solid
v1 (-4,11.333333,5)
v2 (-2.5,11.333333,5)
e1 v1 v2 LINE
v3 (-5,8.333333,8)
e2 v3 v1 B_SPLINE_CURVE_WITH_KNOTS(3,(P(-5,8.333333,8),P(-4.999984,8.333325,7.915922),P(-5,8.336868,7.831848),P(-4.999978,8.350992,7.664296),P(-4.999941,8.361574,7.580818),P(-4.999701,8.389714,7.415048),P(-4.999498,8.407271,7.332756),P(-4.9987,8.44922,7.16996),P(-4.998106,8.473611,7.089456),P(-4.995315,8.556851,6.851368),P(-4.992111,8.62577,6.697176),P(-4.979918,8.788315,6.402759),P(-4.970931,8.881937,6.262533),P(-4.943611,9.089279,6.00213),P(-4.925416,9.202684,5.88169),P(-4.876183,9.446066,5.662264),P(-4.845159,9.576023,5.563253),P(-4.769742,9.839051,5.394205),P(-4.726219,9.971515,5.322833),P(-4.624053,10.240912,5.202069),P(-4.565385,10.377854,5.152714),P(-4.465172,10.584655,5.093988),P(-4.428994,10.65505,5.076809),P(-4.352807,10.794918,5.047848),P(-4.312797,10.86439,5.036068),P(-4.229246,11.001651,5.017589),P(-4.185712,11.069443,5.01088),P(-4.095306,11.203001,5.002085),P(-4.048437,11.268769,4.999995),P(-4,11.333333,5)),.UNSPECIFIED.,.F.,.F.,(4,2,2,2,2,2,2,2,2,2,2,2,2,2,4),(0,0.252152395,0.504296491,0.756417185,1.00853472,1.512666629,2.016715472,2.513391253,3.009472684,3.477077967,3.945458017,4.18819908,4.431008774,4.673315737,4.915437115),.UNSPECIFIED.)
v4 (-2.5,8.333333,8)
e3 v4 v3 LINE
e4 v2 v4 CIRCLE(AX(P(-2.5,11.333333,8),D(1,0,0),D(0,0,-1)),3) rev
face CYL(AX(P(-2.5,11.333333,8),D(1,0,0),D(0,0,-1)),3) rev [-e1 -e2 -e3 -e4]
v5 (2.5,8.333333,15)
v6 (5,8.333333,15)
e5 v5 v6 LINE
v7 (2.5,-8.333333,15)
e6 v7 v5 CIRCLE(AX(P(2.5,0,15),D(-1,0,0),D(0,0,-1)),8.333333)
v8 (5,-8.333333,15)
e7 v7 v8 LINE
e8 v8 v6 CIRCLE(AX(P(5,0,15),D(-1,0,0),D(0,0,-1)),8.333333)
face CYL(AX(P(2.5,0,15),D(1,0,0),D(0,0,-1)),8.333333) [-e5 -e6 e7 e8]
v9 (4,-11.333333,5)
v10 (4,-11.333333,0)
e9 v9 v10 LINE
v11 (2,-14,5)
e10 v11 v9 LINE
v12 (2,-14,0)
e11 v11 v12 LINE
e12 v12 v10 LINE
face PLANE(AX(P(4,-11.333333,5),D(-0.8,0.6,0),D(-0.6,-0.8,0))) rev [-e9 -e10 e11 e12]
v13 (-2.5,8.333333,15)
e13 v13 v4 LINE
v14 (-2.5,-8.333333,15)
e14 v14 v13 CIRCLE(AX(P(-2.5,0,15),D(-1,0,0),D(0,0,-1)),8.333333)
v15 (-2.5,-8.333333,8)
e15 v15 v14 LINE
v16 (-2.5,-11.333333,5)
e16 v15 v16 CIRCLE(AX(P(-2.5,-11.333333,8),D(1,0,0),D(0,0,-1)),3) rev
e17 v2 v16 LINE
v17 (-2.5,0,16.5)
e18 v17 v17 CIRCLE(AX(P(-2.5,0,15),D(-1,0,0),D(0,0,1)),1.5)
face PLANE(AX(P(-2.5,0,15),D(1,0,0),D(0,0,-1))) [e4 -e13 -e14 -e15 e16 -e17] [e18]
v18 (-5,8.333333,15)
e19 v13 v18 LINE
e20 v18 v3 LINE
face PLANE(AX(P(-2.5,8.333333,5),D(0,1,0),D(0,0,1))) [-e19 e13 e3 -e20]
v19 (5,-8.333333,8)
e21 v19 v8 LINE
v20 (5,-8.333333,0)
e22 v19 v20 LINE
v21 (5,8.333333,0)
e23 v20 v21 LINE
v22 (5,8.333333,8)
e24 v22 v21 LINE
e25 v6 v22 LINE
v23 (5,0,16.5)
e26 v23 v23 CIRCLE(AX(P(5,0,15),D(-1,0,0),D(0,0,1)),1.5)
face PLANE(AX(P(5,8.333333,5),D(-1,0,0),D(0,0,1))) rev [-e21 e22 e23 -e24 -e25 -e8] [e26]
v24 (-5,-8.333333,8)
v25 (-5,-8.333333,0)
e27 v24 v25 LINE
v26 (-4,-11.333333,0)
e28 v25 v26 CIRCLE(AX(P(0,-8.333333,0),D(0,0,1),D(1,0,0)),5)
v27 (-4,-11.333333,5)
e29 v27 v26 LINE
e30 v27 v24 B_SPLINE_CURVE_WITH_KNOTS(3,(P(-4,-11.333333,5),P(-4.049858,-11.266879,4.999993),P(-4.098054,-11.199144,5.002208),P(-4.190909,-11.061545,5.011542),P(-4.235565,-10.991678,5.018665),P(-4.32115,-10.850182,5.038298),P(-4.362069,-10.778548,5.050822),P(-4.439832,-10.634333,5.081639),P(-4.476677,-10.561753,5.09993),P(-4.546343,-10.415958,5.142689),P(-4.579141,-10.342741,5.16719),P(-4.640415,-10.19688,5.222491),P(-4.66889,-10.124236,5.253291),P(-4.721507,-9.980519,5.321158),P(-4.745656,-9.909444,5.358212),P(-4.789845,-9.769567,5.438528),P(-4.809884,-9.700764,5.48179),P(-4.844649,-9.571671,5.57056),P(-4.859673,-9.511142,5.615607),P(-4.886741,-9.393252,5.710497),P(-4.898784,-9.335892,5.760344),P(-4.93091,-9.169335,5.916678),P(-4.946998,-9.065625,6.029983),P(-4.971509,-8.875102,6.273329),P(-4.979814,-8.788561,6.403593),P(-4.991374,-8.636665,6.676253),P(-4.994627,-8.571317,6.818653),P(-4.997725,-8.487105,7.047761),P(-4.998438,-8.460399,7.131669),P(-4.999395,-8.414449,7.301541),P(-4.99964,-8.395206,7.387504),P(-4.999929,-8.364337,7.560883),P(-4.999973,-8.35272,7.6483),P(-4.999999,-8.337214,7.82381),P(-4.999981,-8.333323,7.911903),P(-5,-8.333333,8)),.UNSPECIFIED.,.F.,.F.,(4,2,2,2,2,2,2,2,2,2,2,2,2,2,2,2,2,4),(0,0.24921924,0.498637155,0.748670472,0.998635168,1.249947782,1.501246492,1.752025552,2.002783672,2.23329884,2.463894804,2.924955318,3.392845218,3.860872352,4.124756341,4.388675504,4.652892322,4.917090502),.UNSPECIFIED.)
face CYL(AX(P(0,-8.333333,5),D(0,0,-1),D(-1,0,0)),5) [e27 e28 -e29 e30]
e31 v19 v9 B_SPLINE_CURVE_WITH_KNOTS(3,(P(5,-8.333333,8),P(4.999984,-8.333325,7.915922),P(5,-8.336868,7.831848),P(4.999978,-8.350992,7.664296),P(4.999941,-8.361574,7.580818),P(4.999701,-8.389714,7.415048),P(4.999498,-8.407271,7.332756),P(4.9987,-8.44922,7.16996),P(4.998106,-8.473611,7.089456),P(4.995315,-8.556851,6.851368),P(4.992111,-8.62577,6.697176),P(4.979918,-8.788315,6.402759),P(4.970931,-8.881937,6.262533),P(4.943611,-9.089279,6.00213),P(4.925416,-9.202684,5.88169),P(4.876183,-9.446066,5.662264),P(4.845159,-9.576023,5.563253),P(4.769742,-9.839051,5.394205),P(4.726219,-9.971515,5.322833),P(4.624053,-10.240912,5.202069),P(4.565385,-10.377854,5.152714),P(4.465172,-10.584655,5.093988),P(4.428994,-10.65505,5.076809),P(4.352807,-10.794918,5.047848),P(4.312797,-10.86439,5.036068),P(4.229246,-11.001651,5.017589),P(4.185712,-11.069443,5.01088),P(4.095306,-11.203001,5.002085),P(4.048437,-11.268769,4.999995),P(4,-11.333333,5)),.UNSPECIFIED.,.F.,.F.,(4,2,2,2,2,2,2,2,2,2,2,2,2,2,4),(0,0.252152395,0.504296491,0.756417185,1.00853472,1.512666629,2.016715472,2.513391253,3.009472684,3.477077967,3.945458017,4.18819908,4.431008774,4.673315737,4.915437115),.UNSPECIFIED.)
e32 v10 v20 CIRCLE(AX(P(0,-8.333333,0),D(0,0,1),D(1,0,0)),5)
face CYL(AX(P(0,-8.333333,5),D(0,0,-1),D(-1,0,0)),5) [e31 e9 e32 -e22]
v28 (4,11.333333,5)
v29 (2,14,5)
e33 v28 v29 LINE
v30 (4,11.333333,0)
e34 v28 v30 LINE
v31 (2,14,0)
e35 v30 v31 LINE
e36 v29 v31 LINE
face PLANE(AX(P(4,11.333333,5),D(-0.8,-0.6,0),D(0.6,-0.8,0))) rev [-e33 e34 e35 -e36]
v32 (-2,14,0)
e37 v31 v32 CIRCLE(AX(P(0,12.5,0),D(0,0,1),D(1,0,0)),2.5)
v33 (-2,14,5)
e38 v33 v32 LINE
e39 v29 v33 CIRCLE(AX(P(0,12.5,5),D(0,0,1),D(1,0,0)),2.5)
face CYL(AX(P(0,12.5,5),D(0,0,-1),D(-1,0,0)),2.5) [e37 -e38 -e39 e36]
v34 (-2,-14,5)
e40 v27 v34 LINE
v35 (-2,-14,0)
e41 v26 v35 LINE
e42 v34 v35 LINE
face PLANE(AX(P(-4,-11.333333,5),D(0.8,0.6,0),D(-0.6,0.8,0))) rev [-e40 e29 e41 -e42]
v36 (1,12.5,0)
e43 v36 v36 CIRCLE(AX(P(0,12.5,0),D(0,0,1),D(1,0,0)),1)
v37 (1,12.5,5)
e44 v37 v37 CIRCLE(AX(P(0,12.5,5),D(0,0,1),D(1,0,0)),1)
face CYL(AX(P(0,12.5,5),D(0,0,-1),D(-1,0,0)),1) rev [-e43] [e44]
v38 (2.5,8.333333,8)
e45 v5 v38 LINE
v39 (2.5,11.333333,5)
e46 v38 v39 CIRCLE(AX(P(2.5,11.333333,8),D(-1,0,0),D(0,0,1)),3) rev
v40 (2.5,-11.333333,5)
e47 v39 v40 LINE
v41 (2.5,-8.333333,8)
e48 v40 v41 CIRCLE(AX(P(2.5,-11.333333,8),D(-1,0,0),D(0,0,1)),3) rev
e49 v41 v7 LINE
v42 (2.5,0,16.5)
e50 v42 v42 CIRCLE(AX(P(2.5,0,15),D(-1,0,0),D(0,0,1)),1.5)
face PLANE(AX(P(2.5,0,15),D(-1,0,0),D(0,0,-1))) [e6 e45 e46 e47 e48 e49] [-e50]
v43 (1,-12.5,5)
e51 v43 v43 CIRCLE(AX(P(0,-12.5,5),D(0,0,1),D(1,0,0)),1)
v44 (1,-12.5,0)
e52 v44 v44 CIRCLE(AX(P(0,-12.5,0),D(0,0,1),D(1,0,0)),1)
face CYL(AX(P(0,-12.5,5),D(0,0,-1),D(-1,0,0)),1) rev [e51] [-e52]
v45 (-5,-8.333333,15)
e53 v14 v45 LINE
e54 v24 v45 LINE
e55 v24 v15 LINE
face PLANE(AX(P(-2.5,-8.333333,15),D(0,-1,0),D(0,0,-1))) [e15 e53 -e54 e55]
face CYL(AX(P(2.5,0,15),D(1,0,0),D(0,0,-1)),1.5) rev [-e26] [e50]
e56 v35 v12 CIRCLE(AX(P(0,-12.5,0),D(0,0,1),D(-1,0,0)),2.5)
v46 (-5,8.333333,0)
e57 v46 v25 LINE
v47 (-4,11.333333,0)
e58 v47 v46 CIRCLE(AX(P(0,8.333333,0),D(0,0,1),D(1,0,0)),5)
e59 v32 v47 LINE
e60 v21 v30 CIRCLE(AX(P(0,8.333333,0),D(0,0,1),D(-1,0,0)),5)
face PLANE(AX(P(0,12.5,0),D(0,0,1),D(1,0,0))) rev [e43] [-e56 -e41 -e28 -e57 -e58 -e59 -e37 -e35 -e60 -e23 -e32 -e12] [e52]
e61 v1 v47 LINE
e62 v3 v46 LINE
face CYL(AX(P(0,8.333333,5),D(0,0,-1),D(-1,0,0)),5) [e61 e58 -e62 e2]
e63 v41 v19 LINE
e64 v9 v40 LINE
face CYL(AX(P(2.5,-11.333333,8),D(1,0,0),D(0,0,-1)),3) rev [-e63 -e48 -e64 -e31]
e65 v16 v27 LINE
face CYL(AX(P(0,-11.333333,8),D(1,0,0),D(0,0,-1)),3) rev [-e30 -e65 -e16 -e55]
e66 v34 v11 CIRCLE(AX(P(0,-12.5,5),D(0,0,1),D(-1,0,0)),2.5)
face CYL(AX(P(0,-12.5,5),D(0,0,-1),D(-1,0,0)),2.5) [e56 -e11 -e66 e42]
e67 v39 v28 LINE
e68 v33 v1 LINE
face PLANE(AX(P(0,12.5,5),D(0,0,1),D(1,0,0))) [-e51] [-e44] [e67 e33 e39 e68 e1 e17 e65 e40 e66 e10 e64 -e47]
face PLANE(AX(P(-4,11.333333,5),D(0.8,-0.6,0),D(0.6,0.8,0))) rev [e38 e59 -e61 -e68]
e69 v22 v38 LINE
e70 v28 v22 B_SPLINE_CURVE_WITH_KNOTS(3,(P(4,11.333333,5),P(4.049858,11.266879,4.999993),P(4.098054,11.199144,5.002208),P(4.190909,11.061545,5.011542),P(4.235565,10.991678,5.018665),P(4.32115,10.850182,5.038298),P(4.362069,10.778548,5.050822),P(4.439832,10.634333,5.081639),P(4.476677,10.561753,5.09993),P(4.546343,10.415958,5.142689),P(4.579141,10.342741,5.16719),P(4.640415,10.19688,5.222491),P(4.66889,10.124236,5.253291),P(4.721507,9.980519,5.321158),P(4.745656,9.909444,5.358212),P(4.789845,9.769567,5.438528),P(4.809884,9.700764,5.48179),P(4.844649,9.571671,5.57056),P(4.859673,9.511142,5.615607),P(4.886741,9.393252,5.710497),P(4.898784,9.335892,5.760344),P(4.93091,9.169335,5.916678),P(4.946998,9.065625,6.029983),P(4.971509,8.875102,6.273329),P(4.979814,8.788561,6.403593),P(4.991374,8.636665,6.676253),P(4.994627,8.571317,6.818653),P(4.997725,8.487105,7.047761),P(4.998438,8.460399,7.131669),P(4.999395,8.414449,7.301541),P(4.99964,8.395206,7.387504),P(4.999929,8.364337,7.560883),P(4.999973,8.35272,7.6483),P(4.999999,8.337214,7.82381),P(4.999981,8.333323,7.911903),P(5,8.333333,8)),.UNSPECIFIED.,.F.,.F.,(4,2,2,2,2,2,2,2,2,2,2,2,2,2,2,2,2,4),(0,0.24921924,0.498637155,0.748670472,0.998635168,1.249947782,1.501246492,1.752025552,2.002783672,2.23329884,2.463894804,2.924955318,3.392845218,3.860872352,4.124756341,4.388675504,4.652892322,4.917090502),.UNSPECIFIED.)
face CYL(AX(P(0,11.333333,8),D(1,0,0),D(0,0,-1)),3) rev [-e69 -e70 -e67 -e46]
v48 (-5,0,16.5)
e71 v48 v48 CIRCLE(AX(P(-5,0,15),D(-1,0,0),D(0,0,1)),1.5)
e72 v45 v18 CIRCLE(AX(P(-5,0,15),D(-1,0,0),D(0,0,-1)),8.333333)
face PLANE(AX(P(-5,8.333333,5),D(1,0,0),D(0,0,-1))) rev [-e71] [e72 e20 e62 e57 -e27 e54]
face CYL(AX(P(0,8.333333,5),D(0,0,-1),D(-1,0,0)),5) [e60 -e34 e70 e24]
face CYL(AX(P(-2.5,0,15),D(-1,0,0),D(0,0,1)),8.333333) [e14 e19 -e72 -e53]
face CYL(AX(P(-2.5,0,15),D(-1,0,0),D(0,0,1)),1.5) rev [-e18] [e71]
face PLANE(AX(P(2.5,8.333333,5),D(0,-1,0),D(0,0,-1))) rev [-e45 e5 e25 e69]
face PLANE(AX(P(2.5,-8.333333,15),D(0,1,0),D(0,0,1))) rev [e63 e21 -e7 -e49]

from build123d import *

# Parameters (mm, degrees)
ESQUISSE1_R        = 1
BOSS_EXTRU_1_DEPTH = 5
ESQUISSE2_R        = 1.5
BOSS_EXTRU_2_DEPTH = 2.5
CONG_1_R           = 3


with BuildPart() as part:
    # Esquisse1 → Boss.-Extru.1 (new body)
    with BuildSketch(Plane.XY):
        with BuildLine():
            Line((-4, 11.333333333), (-2, 14))
            ThreePointArc((-2, 14), (0, 15), (2, 14))
            Line((2, 14), (4, 11.333333333))
            ThreePointArc((4, 11.333333333), (4.74341649, 9.914472163), (5, 8.333333333))
            Line((5, 8.333333333), (5, -8.333333333))
            ThreePointArc((5, -8.333333333), (4.74341649, -9.914472163), (4, -11.333333333))
            Line((4, -11.333333333), (2, -14))
            ThreePointArc((2, -14), (0, -15), (-2, -14))
            Line((-2, -14), (-4, -11.333333333))
            ThreePointArc((-4, -11.333333333), (-4.74341649, -9.914472163), (-5, -8.333333333))
            Line((-5, -8.333333333), (-5, 8.333333333))
            ThreePointArc((-5, 8.333333333), (-4.74341649, 9.914472163), (-4, 11.333333333))
        make_face()
        with Locations((0, 12.5)):
            Circle(ESQUISSE1_R, mode=Mode.SUBTRACT)
        with Locations((0, -12.5)):
            Circle(ESQUISSE1_R, mode=Mode.SUBTRACT)
    extrude(amount=BOSS_EXTRU_1_DEPTH)

    # Esquisse2 → Boss.-Extru.2 (add)
    with BuildSketch(Plane.ZY.offset(5)):
        with BuildLine():
            Line((5, 8.333333333), (15, 8.333333333))
            ThreePointArc((15, 8.333333333), (23.333333333, 0), (15, -8.333333333))
            Line((15, -8.333333333), (5, -8.333333333))
            Line((5, -8.333333333), (5, 8.333333333))
        make_face()
        with Locations((15, 0)):
            Circle(ESQUISSE2_R, mode=Mode.SUBTRACT)
    boss_extru_2 = extrude(amount=-BOSS_EXTRU_2_DEPTH)

    # Symétrie1: Boss.-Extru.2 across plane
    add(boss_extru_2.mirror(Plane(origin=(0, 0, 0), x_dir=(0, 0, 1), z_dir=(1, 0, 0))))

    # Congé1
    # the kernel refuses this fillet: 3 mm, written as the material it adds along each edge
    with BuildSketch(Plane(origin=(12.5, 8.333333333, 5), x_dir=(0, 1, 0), z_dir=(-1, 0, 0))) as cong_1_piece_1_section:
        with BuildLine():
            CenterArc((CONG_1_R, -CONG_1_R), CONG_1_R, 90, 90)
            Line((0, -CONG_1_R), (0, 0))
            Line((0, 0), (CONG_1_R, 0))
        make_face()
    cong_1_piece_1 = extrude(amount=10, mode=Mode.PRIVATE)
    cong_1_piece_1 = cong_1_piece_1 & Plane(origin=(0, 8.333333333, 5.683499062), x_dir=(-1, 0, 0), z_dir=(0, 0, -1)) * Cylinder(5, 32, mode=Mode.PRIVATE)
    add(cong_1_piece_1)
    with BuildSketch(Plane(origin=(12.5, 8.333333333, 5), x_dir=(0, 1, 0), z_dir=(-1, 0, 0))) as cong_1_piece_2_section:
        with BuildLine():
            CenterArc((CONG_1_R, -CONG_1_R), CONG_1_R, 90, 90)
            Line((0, -CONG_1_R), (0, 0))
            Line((0, 0), (CONG_1_R, 0))
        make_face()
    cong_1_piece_2 = extrude(amount=17.5, mode=Mode.PRIVATE)
    cong_1_piece_2 = cong_1_piece_2 & Plane(origin=(0, 8.333333333, 5.683498856), x_dir=(-1, 0, 0), z_dir=(0, 0, -1)) * Cylinder(5, 47, mode=Mode.PRIVATE)
    cong_1_piece_2 = split(cong_1_piece_2, bisect_by=Plane(origin=(-2.5, 8.977430515, 5.683498856), z_dir=(-1, 0, 0)), keep=Keep.TOP, mode=Mode.PRIVATE)
    add(cong_1_piece_2)
    with BuildSketch(Plane(origin=(12.5, -8.333333333, 5), x_dir=(0, -1, 0), z_dir=(-1, 0, 0))) as cong_1_piece_3_section:
        with BuildLine():
            CenterArc((CONG_1_R, CONG_1_R), CONG_1_R, 180, 90)
            Line((0, CONG_1_R), (0, 0))
            Line((0, 0), (CONG_1_R, 0))
        make_face()
    cong_1_piece_3 = extrude(amount=10, mode=Mode.PRIVATE)
    cong_1_piece_3 = cong_1_piece_3 & Plane(origin=(0, -8.333333333, 5.683498856), x_dir=(-0.8000000000000032, -0.5999999999999958, 0), z_dir=(0, 0, -1)) * Cylinder(5, 32, mode=Mode.PRIVATE)
    add(cong_1_piece_3)
    with BuildSketch(Plane(origin=(12.5, -8.333333333, 5), x_dir=(0, -1, 0), z_dir=(-1, 0, 0))) as cong_1_piece_4_section:
        with BuildLine():
            CenterArc((CONG_1_R, CONG_1_R), CONG_1_R, 180, 90)
            Line((0, CONG_1_R), (0, 0))
            Line((0, 0), (CONG_1_R, 0))
        make_face()
    cong_1_piece_4 = extrude(amount=17.5, mode=Mode.PRIVATE)
    cong_1_piece_4 = cong_1_piece_4 & Plane(origin=(0, -8.333333333, 5.683499062), x_dir=(-0.8000000000000032, -0.5999999999999958, 0), z_dir=(0, 0, -1)) * Cylinder(5, 47, mode=Mode.PRIVATE)
    cong_1_piece_4 = split(cong_1_piece_4, bisect_by=Plane(origin=(-2.5, -8.97743132, 5.683499062), z_dir=(-1, 0, 0)), keep=Keep.TOP, mode=Mode.PRIVATE)
    add(cong_1_piece_4)
    with BuildSketch(Plane(origin=(-12.5, 8.333333333, 5), x_dir=(0, 1, 0), z_dir=(1, 0, 0))) as cong_1_piece_5_section:
        with BuildLine():
            CenterArc((CONG_1_R, CONG_1_R), CONG_1_R, 180, 90)
            Line((0, CONG_1_R), (0, 0))
            Line((0, 0), (CONG_1_R, 0))
        make_face()
    cong_1_piece_5 = extrude(amount=10, mode=Mode.PRIVATE)
    cong_1_piece_5 = cong_1_piece_5 & Plane(origin=(0, 8.333333333, 5.683498856), x_dir=(-1, 0, 0), z_dir=(0, 0, -1)) * Cylinder(5, 32, mode=Mode.PRIVATE)
    add(cong_1_piece_5)
    with BuildSketch(Plane(origin=(-12.5, 8.333333333, 5), x_dir=(0, 1, 0), z_dir=(1, 0, 0))) as cong_1_piece_6_section:
        with BuildLine():
            CenterArc((CONG_1_R, CONG_1_R), CONG_1_R, 180, 90)
            Line((0, CONG_1_R), (0, 0))
            Line((0, 0), (CONG_1_R, 0))
        make_face()
    cong_1_piece_6 = extrude(amount=17.5, mode=Mode.PRIVATE)
    cong_1_piece_6 = cong_1_piece_6 & Plane(origin=(0, 8.333333333, 5.683499062), x_dir=(-1, 0, 0), z_dir=(0, 0, -1)) * Cylinder(5, 47, mode=Mode.PRIVATE)
    cong_1_piece_6 = split(cong_1_piece_6, bisect_by=Plane(origin=(2.5, 8.97743132, 5.683499062), z_dir=(1, 0, 0)), keep=Keep.TOP, mode=Mode.PRIVATE)
    add(cong_1_piece_6)
    with BuildSketch(Plane(origin=(-12.5, -8.333333333, 5), x_dir=(0, -1, 0), z_dir=(1, 0, 0))) as cong_1_piece_7_section:
        with BuildLine():
            CenterArc((CONG_1_R, -CONG_1_R), CONG_1_R, 90, 90)
            Line((0, -CONG_1_R), (0, 0))
            Line((0, 0), (CONG_1_R, 0))
        make_face()
    cong_1_piece_7 = extrude(amount=10, mode=Mode.PRIVATE)
    cong_1_piece_7 = cong_1_piece_7 & Plane(origin=(0, -8.333333333, 5.683499062), x_dir=(-0.8000000000000032, -0.5999999999999958, 0), z_dir=(0, 0, -1)) * Cylinder(5, 32, mode=Mode.PRIVATE)
    add(cong_1_piece_7)
    with BuildSketch(Plane(origin=(-12.5, -8.333333333, 5), x_dir=(0, -1, 0), z_dir=(1, 0, 0))) as cong_1_piece_8_section:
        with BuildLine():
            CenterArc((CONG_1_R, -CONG_1_R), CONG_1_R, 90, 90)
            Line((0, -CONG_1_R), (0, 0))
            Line((0, 0), (CONG_1_R, 0))
        make_face()
    cong_1_piece_8 = extrude(amount=17.5, mode=Mode.PRIVATE)
    cong_1_piece_8 = cong_1_piece_8 & Plane(origin=(0, -8.333333333, 5.683498856), x_dir=(-0.8000000000000032, -0.5999999999999958, 0), z_dir=(0, 0, -1)) * Cylinder(5, 47, mode=Mode.PRIVATE)
    cong_1_piece_8 = split(cong_1_piece_8, bisect_by=Plane(origin=(2.5, -8.977430515, 5.683498856), z_dir=(1, 0, 0)), keep=Keep.TOP, mode=Mode.PRIVATE)
    add(cong_1_piece_8)


solid = part.part
